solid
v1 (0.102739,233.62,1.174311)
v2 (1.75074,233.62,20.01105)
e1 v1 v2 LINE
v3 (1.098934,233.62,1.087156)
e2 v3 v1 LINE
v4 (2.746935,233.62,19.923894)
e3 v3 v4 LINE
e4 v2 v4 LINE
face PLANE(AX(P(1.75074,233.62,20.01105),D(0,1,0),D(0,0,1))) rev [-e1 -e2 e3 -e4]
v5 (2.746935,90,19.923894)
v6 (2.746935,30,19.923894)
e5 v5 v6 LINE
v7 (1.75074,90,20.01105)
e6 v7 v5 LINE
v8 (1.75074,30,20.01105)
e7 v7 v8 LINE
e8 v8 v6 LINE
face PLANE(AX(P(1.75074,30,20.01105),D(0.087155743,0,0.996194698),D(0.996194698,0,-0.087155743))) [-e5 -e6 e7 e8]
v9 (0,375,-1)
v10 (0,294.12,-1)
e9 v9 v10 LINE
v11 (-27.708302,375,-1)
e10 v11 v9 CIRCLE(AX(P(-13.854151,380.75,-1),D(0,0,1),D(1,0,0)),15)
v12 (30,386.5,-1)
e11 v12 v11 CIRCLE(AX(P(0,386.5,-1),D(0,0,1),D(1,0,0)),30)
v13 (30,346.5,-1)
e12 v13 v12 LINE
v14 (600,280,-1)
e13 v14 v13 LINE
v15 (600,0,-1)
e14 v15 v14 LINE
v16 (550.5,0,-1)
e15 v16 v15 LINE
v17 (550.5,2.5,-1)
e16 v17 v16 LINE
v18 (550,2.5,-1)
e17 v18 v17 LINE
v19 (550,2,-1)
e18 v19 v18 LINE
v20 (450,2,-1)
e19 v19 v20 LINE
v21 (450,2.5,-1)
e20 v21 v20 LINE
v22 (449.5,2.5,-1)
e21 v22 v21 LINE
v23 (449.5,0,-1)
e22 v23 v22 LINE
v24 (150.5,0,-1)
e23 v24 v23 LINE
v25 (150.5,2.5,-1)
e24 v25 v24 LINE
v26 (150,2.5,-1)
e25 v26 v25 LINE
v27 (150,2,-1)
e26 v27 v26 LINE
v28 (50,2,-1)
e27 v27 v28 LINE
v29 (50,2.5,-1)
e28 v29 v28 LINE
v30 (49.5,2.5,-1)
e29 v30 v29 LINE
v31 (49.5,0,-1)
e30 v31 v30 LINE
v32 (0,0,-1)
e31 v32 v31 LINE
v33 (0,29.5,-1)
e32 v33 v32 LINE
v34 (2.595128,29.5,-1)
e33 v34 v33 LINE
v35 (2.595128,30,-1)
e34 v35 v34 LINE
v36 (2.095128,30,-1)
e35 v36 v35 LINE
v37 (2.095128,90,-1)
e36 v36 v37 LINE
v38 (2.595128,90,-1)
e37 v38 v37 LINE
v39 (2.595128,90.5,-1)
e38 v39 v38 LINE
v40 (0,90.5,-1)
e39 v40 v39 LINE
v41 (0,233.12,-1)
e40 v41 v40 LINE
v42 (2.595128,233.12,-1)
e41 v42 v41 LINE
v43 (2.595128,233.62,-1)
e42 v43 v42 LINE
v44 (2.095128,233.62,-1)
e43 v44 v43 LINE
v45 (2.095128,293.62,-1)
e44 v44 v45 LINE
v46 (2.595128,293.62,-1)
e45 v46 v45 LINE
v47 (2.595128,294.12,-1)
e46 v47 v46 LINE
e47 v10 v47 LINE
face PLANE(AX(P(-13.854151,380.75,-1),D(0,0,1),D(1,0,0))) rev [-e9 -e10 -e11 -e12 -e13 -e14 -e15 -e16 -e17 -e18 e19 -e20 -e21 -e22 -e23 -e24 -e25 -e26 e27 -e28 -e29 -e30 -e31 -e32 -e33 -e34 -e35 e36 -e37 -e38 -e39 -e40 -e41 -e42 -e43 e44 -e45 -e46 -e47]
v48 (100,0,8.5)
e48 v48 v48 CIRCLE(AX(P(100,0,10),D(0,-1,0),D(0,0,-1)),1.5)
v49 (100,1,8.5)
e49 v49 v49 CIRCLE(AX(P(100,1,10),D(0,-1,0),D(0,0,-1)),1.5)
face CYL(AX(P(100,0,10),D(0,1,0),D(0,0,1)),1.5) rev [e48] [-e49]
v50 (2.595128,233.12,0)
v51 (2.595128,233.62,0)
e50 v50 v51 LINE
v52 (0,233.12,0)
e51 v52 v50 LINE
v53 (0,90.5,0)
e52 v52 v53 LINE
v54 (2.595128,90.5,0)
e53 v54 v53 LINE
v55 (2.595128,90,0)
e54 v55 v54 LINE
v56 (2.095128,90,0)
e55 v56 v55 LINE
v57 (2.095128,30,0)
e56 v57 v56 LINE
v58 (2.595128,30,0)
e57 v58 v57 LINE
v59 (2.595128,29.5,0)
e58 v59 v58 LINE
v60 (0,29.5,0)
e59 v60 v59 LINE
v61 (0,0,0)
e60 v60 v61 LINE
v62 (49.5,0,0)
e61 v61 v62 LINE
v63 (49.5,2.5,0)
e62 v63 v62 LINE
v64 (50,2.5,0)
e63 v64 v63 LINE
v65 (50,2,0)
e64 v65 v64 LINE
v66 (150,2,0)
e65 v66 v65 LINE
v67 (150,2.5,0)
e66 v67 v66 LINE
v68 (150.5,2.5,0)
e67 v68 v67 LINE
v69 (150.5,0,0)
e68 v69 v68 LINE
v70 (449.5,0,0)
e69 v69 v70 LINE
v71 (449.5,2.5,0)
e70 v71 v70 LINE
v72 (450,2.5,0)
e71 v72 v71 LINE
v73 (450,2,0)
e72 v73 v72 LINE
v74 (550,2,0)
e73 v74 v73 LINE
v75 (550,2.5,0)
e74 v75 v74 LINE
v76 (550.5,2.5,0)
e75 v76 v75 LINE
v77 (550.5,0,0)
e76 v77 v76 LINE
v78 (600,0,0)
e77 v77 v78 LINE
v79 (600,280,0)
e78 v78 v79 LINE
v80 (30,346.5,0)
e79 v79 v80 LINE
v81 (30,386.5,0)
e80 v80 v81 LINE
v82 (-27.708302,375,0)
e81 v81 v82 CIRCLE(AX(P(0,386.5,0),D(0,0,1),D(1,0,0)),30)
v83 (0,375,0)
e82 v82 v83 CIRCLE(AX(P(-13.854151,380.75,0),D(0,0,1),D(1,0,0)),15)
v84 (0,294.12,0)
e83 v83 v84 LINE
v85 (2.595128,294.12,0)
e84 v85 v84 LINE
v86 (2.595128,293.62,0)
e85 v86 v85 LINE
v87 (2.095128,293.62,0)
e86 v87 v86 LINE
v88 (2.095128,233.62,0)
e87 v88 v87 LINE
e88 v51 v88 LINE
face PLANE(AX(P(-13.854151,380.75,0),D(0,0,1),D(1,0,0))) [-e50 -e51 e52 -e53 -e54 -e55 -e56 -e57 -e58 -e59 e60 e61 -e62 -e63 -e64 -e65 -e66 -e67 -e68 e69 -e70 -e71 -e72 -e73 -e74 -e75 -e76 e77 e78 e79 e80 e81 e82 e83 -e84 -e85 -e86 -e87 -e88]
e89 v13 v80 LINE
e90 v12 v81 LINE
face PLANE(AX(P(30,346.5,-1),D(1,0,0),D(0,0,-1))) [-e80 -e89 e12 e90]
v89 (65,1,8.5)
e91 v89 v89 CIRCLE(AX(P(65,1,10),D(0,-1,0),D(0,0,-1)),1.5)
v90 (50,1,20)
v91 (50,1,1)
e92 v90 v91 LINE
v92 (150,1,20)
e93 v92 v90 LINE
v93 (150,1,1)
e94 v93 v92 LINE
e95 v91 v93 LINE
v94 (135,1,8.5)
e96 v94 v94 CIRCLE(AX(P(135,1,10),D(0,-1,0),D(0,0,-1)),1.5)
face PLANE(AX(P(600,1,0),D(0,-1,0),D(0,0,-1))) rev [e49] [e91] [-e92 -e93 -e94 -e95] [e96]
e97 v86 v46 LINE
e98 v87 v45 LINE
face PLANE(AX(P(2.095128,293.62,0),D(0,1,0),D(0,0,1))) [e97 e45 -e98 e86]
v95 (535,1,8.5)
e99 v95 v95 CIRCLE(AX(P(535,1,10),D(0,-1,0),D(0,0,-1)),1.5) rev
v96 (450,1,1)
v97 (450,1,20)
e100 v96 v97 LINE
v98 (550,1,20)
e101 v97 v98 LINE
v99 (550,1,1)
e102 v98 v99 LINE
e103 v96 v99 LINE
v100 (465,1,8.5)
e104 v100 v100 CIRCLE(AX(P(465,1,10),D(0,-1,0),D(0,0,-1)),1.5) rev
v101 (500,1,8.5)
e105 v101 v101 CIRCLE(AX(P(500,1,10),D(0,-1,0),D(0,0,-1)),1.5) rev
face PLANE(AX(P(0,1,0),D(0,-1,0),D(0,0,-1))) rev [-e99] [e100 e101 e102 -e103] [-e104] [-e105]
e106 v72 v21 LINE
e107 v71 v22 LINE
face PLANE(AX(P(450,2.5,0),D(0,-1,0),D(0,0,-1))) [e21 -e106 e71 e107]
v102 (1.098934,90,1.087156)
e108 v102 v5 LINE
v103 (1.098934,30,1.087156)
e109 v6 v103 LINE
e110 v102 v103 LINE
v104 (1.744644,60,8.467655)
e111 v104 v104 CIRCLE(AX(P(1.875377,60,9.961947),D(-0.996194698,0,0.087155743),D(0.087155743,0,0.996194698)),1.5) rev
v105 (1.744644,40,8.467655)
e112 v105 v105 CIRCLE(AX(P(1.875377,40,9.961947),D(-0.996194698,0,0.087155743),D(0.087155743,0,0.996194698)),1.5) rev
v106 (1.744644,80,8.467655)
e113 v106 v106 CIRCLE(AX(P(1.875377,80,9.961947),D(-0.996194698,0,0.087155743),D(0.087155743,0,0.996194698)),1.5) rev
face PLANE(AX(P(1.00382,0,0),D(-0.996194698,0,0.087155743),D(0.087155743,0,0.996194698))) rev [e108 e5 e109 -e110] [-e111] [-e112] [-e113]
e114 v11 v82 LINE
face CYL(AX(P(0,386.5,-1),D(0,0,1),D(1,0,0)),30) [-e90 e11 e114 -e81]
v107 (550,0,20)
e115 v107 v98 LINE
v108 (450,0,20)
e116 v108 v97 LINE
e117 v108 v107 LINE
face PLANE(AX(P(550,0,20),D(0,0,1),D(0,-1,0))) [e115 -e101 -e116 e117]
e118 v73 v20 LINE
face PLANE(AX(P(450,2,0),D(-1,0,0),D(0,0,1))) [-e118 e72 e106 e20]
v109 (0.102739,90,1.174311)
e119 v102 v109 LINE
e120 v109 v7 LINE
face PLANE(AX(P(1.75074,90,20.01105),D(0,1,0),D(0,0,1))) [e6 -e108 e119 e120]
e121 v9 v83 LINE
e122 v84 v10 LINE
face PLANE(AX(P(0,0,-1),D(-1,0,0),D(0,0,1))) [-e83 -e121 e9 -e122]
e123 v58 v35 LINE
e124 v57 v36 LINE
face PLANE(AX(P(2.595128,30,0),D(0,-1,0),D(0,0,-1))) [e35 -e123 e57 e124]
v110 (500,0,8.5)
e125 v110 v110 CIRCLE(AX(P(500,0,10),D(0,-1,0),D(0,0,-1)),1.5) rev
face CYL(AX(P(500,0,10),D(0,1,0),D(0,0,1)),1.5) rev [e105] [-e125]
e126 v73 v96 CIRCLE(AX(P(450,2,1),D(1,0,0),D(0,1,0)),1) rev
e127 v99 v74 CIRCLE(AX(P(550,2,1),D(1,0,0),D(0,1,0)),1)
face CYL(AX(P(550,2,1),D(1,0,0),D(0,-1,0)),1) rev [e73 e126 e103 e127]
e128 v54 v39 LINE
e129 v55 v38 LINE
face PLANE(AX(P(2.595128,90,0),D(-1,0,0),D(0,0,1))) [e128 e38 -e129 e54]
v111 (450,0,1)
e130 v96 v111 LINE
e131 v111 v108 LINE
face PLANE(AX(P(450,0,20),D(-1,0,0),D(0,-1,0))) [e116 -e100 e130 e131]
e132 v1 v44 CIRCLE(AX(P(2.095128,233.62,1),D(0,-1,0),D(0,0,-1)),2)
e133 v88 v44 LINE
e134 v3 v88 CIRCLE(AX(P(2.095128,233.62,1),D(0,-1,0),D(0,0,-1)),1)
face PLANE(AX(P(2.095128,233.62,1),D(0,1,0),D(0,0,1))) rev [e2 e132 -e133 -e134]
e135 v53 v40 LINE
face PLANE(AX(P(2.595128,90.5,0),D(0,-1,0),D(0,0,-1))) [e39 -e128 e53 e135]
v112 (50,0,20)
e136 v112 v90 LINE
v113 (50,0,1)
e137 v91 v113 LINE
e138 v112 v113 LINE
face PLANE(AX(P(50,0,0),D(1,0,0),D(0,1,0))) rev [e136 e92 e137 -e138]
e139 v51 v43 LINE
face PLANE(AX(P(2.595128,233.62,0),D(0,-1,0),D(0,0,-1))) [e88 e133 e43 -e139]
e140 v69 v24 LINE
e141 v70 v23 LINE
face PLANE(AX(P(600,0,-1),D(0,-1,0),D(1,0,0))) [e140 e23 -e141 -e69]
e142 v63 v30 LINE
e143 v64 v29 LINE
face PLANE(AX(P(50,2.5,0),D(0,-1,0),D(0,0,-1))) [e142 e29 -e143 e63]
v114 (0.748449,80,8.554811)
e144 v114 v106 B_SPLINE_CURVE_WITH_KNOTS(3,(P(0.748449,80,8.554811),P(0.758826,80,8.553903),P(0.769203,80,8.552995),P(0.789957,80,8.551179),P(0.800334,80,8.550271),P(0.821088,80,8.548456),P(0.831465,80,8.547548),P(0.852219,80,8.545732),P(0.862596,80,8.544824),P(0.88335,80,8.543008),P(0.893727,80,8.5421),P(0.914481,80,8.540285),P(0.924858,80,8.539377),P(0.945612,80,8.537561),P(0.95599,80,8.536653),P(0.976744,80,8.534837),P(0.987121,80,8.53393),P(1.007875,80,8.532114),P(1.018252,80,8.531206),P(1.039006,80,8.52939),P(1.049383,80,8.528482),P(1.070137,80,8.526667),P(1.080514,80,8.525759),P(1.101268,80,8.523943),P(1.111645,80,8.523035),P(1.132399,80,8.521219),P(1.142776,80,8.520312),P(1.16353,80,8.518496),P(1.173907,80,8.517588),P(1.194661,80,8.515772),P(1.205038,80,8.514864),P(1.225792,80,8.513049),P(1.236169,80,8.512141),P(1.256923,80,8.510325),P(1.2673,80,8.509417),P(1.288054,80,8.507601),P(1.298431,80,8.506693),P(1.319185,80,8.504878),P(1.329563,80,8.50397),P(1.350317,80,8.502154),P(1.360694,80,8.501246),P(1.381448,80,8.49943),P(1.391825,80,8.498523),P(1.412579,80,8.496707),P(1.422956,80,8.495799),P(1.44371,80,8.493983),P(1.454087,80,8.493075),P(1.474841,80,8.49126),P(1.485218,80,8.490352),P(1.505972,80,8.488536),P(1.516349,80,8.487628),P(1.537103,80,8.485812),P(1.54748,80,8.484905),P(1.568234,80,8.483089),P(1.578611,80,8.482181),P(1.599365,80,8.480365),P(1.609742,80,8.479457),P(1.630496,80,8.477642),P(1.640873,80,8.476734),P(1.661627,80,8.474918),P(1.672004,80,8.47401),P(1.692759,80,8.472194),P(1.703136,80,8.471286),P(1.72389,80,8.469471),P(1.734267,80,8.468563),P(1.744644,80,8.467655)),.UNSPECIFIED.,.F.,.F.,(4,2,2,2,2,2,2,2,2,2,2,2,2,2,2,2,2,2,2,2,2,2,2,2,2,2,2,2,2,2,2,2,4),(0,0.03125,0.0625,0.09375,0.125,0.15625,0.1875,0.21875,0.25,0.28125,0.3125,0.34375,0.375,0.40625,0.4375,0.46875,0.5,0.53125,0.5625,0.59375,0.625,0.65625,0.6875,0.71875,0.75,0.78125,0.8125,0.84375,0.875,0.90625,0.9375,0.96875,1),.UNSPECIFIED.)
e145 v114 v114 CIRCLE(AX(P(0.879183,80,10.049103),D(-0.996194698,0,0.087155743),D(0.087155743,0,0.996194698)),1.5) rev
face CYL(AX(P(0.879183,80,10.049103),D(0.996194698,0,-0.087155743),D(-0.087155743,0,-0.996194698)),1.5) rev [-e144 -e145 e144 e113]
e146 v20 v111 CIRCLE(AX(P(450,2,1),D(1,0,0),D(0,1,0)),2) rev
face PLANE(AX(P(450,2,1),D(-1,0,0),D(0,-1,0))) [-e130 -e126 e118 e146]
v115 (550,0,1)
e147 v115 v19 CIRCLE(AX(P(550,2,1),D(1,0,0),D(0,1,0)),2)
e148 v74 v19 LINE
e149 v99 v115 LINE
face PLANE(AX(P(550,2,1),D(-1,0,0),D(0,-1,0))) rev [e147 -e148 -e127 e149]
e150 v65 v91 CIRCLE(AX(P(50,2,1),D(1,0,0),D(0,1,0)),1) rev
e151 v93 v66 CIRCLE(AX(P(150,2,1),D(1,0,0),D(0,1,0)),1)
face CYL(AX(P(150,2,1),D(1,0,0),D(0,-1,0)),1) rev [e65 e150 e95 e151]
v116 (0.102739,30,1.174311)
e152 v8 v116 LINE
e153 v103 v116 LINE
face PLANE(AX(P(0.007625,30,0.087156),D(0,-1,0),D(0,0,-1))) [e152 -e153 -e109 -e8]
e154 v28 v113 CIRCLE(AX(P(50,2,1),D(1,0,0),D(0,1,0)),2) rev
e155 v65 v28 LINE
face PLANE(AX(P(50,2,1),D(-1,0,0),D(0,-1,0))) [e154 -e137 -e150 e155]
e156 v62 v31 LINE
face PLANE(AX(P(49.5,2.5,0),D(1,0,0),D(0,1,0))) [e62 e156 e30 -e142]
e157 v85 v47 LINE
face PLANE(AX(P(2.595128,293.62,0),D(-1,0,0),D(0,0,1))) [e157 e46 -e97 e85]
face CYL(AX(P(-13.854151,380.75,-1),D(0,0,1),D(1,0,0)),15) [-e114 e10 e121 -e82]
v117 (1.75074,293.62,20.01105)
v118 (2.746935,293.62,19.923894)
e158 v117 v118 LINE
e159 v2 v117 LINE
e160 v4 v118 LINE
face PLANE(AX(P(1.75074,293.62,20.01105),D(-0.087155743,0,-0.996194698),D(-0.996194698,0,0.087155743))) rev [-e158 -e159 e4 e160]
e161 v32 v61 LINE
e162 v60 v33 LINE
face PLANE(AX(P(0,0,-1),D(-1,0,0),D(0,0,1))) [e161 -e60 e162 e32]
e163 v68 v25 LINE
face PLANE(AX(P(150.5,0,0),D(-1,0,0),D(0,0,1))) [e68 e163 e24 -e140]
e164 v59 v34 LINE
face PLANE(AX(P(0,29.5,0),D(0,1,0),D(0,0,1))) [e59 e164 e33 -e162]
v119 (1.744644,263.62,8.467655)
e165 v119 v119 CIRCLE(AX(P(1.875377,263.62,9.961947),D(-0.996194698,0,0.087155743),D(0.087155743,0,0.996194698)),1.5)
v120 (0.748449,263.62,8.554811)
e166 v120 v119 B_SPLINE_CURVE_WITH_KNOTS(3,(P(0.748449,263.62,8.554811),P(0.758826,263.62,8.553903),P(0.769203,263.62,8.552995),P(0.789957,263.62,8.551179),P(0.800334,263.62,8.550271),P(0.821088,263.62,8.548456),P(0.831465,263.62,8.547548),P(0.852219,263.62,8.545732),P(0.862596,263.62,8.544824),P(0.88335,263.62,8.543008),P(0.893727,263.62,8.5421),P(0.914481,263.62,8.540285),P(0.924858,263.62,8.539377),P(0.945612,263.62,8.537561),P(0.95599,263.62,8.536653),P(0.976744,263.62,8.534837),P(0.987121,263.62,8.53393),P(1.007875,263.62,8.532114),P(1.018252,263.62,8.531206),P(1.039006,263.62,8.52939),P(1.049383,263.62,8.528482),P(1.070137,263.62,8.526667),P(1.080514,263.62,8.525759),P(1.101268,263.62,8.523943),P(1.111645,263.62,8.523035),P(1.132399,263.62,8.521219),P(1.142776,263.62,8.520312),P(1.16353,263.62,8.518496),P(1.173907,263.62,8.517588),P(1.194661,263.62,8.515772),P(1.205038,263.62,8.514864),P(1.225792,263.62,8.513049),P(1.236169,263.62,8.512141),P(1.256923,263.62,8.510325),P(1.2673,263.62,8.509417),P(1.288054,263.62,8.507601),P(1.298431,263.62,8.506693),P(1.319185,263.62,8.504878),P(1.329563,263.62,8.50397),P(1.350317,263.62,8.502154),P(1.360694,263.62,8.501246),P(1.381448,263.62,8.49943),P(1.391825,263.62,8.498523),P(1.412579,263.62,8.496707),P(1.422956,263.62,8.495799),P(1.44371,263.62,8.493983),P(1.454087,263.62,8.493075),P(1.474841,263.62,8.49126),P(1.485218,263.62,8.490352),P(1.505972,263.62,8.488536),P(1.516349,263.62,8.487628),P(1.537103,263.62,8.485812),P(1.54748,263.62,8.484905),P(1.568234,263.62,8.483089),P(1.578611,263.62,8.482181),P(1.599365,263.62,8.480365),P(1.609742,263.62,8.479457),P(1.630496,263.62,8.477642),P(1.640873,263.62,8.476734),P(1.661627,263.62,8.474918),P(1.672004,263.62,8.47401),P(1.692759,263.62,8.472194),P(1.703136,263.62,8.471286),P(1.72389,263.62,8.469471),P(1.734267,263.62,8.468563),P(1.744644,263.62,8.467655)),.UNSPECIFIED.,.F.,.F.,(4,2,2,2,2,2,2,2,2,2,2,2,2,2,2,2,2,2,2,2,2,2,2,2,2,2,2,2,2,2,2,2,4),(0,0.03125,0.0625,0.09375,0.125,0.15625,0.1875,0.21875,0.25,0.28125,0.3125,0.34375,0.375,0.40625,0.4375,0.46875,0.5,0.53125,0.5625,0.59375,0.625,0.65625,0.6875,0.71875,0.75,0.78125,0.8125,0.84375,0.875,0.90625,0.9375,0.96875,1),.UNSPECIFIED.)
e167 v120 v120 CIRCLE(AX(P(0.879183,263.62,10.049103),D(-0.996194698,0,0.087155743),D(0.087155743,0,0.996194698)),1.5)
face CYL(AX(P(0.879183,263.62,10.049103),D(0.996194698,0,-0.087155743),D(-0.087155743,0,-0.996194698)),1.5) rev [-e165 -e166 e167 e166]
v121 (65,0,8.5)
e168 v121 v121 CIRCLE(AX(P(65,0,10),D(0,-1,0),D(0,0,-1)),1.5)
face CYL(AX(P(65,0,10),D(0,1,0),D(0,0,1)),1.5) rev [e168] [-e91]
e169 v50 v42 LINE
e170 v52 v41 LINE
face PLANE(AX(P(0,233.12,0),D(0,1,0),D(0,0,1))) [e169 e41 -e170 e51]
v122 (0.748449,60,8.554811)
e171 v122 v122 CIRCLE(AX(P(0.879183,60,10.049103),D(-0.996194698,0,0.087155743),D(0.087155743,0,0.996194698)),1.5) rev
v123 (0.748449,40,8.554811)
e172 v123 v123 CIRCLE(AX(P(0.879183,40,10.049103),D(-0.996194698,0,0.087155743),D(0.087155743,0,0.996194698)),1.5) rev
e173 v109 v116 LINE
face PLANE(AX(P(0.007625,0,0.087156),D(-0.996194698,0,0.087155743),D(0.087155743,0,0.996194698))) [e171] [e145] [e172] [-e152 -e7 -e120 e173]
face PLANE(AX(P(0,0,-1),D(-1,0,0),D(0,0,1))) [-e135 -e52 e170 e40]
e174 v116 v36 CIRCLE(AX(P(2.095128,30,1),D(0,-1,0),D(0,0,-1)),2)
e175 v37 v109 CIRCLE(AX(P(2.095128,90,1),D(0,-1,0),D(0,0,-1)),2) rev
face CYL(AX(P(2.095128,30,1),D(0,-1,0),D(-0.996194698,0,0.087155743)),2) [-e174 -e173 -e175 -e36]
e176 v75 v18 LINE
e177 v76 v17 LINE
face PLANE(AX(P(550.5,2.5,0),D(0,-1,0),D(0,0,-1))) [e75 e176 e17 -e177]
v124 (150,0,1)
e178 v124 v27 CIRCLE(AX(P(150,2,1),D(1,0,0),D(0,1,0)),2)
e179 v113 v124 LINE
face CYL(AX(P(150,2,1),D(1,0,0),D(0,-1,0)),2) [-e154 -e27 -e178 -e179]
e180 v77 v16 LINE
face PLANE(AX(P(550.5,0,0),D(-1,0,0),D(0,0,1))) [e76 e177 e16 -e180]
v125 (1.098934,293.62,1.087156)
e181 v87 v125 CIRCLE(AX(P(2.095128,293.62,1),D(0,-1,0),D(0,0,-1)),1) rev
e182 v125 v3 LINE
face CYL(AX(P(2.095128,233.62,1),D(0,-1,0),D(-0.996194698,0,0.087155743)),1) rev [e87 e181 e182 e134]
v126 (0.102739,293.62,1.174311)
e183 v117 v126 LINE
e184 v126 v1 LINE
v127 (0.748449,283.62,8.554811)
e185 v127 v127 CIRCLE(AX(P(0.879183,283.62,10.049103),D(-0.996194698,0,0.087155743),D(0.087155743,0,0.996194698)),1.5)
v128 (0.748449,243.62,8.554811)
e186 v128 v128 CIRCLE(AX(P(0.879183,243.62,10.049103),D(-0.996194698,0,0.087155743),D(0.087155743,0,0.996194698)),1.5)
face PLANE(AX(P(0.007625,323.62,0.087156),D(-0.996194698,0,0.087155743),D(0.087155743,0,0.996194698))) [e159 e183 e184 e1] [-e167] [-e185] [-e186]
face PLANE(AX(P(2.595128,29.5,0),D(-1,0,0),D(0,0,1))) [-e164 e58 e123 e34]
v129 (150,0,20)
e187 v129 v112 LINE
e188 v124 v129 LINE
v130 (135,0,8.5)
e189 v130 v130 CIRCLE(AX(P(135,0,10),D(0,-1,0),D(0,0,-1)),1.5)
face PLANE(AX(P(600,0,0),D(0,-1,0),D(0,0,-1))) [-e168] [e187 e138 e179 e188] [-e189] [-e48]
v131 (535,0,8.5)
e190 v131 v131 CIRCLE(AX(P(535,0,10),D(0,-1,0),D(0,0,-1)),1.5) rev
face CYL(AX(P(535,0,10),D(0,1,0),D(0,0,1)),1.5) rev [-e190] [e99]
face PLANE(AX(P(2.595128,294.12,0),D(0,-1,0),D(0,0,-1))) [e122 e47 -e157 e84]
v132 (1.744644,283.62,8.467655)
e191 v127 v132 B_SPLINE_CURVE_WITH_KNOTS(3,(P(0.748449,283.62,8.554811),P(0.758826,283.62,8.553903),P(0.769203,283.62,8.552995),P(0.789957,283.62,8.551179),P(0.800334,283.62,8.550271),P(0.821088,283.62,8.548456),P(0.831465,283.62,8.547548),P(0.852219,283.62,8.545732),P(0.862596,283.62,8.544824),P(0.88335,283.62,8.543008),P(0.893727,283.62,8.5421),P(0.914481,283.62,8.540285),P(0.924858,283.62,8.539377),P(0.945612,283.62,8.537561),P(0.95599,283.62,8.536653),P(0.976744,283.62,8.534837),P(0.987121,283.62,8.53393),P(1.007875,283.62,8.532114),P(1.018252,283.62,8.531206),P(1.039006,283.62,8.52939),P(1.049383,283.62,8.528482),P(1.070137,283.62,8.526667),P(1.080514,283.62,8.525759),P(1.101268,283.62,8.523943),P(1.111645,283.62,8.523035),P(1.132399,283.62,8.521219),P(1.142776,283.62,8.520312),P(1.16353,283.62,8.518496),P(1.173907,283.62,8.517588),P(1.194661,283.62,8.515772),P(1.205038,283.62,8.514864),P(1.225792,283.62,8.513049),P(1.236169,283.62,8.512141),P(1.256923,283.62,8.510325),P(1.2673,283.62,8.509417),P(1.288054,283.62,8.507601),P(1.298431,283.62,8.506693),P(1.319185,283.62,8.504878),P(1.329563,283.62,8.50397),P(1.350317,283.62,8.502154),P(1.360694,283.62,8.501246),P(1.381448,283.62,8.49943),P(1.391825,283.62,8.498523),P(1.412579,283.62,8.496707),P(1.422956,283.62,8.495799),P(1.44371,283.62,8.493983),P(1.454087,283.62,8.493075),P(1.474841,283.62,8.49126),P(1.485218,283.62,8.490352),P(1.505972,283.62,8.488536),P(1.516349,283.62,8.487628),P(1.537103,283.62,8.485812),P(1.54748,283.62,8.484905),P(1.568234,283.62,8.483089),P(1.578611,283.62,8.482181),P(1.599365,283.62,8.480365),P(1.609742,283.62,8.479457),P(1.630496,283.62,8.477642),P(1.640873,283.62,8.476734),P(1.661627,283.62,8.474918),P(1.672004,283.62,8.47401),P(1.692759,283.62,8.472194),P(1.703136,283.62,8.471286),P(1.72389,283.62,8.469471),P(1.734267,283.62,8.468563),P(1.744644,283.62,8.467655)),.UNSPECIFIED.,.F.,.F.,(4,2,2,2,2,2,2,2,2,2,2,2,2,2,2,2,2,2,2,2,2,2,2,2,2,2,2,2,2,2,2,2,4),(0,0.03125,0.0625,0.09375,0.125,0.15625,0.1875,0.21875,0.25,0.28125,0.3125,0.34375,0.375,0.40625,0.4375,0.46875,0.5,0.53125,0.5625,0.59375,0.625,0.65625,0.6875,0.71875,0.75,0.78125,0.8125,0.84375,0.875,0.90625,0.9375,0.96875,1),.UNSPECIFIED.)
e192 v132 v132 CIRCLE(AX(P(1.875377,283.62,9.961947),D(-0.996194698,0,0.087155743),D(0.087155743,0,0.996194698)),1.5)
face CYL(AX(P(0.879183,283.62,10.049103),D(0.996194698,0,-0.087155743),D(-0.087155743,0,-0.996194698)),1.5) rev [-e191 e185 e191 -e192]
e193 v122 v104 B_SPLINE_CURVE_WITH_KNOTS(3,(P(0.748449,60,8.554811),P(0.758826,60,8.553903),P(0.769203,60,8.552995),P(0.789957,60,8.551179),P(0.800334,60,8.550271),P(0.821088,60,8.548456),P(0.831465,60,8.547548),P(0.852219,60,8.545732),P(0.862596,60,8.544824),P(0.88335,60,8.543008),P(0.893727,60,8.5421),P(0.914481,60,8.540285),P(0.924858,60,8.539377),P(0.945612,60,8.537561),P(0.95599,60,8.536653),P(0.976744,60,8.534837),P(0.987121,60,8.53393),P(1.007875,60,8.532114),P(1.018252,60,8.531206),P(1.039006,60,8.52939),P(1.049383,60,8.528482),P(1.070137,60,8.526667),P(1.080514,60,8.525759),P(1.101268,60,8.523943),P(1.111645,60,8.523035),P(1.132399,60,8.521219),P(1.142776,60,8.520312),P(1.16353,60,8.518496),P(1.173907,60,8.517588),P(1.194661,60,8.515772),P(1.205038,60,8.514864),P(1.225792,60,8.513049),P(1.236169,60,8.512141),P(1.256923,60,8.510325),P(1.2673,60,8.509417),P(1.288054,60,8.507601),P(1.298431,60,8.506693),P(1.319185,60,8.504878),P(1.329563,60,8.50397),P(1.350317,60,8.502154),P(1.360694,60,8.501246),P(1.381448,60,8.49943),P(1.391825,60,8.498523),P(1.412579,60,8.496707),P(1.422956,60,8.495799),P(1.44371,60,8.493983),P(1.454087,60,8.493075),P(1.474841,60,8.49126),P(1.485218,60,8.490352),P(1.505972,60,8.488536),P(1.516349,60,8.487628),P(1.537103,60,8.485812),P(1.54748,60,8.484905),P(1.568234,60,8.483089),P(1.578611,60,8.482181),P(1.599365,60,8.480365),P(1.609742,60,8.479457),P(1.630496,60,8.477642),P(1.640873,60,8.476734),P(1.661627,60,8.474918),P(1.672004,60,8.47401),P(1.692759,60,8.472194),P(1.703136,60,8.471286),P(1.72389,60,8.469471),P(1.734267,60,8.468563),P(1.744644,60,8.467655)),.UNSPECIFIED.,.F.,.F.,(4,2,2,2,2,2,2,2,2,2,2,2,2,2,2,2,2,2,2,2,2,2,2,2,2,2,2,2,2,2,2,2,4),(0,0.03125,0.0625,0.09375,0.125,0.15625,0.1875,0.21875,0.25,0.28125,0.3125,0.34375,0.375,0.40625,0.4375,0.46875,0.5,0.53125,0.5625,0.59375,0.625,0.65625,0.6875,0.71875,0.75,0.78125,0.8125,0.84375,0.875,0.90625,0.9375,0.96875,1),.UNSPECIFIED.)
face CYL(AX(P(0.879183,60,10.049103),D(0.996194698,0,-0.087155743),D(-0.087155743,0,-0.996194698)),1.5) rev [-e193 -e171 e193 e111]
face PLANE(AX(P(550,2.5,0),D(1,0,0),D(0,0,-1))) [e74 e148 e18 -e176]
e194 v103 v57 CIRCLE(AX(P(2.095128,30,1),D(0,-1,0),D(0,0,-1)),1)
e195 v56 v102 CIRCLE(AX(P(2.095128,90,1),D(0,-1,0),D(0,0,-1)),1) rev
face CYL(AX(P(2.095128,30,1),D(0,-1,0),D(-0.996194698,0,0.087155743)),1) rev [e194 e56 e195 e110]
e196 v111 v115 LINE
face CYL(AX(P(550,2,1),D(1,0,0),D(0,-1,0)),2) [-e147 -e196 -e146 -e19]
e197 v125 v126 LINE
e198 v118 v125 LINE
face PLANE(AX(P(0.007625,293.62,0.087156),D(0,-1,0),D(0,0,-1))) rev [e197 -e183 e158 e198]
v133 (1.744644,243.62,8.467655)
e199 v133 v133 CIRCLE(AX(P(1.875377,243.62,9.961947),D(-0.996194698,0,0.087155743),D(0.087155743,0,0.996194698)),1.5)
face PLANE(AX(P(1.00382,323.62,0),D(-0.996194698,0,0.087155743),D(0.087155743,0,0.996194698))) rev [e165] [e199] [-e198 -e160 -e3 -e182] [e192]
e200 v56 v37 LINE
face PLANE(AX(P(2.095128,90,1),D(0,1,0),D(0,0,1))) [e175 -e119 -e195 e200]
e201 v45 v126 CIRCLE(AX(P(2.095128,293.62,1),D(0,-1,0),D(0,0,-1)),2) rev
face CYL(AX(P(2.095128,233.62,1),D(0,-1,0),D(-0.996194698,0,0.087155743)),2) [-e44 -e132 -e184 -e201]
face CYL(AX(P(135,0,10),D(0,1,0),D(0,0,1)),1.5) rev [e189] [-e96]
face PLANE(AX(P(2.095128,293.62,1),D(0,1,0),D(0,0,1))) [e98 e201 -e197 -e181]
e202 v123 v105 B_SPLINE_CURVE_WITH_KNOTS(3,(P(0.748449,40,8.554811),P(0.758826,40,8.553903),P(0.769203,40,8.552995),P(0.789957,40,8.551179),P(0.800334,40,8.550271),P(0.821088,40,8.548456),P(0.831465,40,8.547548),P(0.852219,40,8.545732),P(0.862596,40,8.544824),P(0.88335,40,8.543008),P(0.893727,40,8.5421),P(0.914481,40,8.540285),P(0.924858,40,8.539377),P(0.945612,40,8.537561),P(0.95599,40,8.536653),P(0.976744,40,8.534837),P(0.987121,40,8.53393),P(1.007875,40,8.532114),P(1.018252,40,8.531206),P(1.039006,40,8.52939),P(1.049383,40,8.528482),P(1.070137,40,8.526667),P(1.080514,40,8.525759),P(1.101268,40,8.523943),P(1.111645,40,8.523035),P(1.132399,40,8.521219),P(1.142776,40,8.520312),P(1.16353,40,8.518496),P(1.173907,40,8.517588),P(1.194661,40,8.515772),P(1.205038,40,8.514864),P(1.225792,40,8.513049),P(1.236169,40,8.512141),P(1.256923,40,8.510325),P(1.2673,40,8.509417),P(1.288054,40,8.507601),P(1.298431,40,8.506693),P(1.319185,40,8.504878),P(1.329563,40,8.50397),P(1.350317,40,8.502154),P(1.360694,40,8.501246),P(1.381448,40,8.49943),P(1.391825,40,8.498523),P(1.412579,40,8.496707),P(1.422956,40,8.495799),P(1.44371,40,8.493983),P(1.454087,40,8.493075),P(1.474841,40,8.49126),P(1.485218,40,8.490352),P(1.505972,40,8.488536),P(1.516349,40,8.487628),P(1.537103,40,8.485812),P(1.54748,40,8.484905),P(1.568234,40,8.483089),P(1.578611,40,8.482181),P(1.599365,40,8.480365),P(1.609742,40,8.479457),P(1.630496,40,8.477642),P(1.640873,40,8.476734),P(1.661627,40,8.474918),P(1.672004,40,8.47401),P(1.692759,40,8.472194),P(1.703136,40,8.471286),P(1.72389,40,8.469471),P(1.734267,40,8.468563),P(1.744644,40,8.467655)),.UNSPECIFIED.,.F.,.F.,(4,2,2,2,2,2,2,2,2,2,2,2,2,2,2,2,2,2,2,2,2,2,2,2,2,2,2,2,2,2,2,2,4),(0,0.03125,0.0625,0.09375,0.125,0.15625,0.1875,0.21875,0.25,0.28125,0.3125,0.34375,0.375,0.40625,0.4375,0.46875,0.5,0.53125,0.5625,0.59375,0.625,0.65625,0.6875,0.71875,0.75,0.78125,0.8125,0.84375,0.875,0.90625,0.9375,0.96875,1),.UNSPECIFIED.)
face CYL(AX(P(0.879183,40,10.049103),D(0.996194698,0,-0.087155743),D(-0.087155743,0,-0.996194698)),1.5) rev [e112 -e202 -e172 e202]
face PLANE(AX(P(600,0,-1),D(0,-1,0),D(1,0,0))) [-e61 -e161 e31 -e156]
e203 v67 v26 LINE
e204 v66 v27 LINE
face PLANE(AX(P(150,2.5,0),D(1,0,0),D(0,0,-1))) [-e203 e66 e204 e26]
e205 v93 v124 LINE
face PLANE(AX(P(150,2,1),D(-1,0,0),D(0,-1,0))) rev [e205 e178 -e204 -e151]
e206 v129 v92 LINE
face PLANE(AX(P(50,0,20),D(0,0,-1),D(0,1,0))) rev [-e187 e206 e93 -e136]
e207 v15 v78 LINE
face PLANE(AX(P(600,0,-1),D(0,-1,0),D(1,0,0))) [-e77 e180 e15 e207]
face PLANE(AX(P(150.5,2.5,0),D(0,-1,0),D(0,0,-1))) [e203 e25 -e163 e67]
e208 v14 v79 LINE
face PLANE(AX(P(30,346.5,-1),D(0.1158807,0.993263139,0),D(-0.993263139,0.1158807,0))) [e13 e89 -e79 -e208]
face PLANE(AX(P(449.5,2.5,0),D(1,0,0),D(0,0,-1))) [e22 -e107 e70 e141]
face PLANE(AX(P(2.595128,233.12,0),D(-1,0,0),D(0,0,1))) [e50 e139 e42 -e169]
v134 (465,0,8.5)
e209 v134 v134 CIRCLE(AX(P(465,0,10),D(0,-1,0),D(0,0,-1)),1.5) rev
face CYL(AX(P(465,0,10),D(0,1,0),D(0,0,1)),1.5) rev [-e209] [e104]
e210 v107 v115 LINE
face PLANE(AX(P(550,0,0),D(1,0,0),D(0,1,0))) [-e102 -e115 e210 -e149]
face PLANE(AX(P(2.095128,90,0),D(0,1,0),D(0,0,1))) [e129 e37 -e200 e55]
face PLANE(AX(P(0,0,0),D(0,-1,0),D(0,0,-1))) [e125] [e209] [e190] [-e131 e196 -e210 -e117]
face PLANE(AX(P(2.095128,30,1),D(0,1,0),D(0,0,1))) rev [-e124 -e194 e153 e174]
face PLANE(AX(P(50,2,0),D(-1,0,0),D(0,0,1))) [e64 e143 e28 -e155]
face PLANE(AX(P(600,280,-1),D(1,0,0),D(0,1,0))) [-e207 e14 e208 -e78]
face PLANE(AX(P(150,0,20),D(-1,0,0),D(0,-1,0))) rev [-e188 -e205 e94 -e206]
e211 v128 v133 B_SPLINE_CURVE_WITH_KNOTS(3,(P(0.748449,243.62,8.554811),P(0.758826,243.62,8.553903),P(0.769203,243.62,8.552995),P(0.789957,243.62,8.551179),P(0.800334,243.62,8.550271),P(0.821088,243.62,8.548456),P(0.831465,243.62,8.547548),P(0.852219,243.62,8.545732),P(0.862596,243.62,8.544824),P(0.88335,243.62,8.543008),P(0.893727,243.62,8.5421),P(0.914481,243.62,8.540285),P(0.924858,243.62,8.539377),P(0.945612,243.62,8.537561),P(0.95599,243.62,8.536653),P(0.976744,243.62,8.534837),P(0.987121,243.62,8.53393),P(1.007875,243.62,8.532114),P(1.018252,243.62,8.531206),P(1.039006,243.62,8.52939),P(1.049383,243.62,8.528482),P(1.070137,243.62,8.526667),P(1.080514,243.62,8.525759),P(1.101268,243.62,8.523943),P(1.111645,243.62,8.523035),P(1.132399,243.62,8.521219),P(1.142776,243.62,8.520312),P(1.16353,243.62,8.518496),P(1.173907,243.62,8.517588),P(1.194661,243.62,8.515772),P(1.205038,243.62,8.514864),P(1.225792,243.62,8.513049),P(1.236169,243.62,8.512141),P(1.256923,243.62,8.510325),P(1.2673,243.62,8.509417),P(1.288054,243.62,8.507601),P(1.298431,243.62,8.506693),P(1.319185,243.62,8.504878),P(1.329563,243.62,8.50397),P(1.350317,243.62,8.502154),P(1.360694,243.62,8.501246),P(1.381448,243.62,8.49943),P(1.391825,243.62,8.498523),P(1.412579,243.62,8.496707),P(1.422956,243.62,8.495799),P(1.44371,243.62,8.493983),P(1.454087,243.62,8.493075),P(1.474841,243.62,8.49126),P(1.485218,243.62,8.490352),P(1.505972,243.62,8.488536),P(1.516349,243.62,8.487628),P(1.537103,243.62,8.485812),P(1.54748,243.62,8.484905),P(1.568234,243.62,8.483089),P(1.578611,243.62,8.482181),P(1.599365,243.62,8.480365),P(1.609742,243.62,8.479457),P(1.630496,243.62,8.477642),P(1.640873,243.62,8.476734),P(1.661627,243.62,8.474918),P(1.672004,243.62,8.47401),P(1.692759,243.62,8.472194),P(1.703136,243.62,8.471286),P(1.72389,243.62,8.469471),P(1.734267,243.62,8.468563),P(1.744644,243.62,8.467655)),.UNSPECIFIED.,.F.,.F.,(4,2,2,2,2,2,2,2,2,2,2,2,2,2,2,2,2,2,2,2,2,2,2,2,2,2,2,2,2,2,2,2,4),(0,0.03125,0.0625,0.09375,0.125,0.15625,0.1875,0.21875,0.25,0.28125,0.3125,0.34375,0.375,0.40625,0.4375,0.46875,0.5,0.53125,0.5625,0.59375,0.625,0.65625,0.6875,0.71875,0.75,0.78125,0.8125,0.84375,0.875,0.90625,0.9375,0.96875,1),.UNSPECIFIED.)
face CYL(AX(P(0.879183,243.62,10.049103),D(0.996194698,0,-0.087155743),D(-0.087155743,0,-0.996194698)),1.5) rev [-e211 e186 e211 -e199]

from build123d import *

# Parameters (mm, degrees)
BASE_FLANGE1_DEPTH            = 1
EDGE_FLANGE1_STRIP_W          = 6
EDGE_FLANGE1_STRIP_H          = 1
EDGE_FLANGE1_STRIP_CUT_DEPTH  = 100
EDGE_FLANGE1_RELIEF_W         = 6.5
EDGE_FLANGE1_RELIEF_H         = 0.5
EDGE_FLANGE1_RELIEF_CUT_DEPTH = 1
EDGE_FLANGE1_DEPTH            = 100
EDGE_FLANGE1_PROFILE_W        = 100
EDGE_FLANGE1_PROFILE_H        = 19
EDGE_FLANGE1_PROFILE_R        = 1.5
EDGE_FLANGE1_FLAT_DEPTH       = 1
EDGE_FLANGE2_START            = 29.5
EDGE_FLANGE2_DEPTH            = 61
EDGE_FLANGE2_2_DEPTH          = 0.5
EDGE_FLANGE2_START_2          = 90
EDGE_FLANGE2_3_DEPTH          = 0.5
EDGE_FLANGE2_START_3          = 30
EDGE_FLANGE2_4_DEPTH          = 60
EDGE_FLANGE2_5_OUTLINE_R      = 1.5
EDGE_FLANGE2_5_DEPTH          = 1


with BuildPart() as part:
    # Base-Flange1: sheet metal written as solids
    # Sketch1 → Base-Flange1 (new body)
    with BuildSketch(Plane.XY):
        with BuildLine():
            Line((0, 0), (0, 350))
            Line((0, 350), (0, 375))
            ThreePointArc((0, 375), (-13.854151002, 365.75), (-27.708302005, 375))
            ThreePointArc((-27.708302005, 375), (-5.863059775, 415.921497754), (30, 386.5))
            Line((30, 386.5), (30, 346.5))
            Line((30, 346.5), (600, 280))
            Line((600, 280), (600, 0))
            Line((600, 0), (0, 0))
        make_face()
    extrude(amount=-BASE_FLANGE1_DEPTH)

    # Edge-Flange1: sheet metal written as solids
    # Edge-Flange1 strip (on a plane across the edge) → Edge-Flange1 strip cut (cut)
    with BuildSketch(Plane.YZ.offset(450)):
        with Locations((-1, -0.5)):
            Rectangle(EDGE_FLANGE1_STRIP_W, EDGE_FLANGE1_STRIP_H)
    edge_flange1_strip_cut = extrude(amount=EDGE_FLANGE1_STRIP_CUT_DEPTH, mode=Mode.SUBTRACT)

    # Edge-Flange1 relief (on the sheet) → Edge-Flange1 relief cut (cut)
    with BuildSketch(Plane(origin=(450, 2, 0), x_dir=(0, 1, 0), z_dir=(0, 0, 1))):
        with Locations((-2.75, 0.25)):
            Rectangle(EDGE_FLANGE1_RELIEF_W, EDGE_FLANGE1_RELIEF_H)
        with Locations((-2.75, -100.25)):
            Rectangle(EDGE_FLANGE1_RELIEF_W, EDGE_FLANGE1_RELIEF_H)
    edge_flange1_relief_cut = extrude(amount=-EDGE_FLANGE1_RELIEF_CUT_DEPTH, mode=Mode.SUBTRACT)

    # Edge-Flange1 bend section (on a plane across the edge) → Edge-Flange1 (add)
    with BuildSketch(Plane.YZ.offset(450)):
        with BuildLine():
            Line((0, 1), (1, 1))
            ThreePointArc((1, 1), (1.292893219, 0.292893219), (2, 0))
            Line((2, 0), (2, -1))
            ThreePointArc((2, -1), (0.585786438, -0.414213562), (0, 1))
        make_face()
    edge_flange1 = extrude(amount=EDGE_FLANGE1_DEPTH)

    # Edge-Flange1 profile (on flange) → Edge-Flange1 flat (add)
    with BuildSketch(Plane(origin=(0, 0, 0), x_dir=(-1, 0, 0), z_dir=(0, 1, 0))):
        with Locations((-500, 10.5)):
            Rectangle(EDGE_FLANGE1_PROFILE_W, EDGE_FLANGE1_PROFILE_H)
        with Locations((-535, 10)):
            Circle(EDGE_FLANGE1_PROFILE_R, mode=Mode.SUBTRACT)
        with Locations((-465, 10)):
            Circle(EDGE_FLANGE1_PROFILE_R, mode=Mode.SUBTRACT)
        with Locations((-500, 10)):
            Circle(EDGE_FLANGE1_PROFILE_R, mode=Mode.SUBTRACT)
    edge_flange1_flat = extrude(amount=EDGE_FLANGE1_FLAT_DEPTH)

    # Mirror1: Edge-Flange1 strip cut, Edge-Flange1 relief cut, Edge-Flange1, Edge-Flange1 flat across plane
    add(edge_flange1_strip_cut.mirror(Plane(origin=(300, 0, 0), x_dir=(0, 0, 1), z_dir=(1, 0, 0))), mode=Mode.SUBTRACT)
    add(edge_flange1_relief_cut.mirror(Plane(origin=(300, 0, 0), x_dir=(0, 0, 1), z_dir=(1, 0, 0))), mode=Mode.SUBTRACT)
    add(edge_flange1.mirror(Plane(origin=(300, 0, 0), x_dir=(0, 0, 1), z_dir=(1, 0, 0))))
    add(edge_flange1_flat.mirror(Plane(origin=(300, 0, 0), x_dir=(0, 0, 1), z_dir=(1, 0, 0))))

    # Edge-Flange2: read off the stored shape, not the designer's step
    # Edge-Flange2 outline → Edge-Flange2 (cut)
    with BuildSketch(Plane(origin=(0, 0, 0), x_dir=(1, 0, 0), z_dir=(0, 1, 0)).offset(EDGE_FLANGE2_START)):
        with BuildLine():
            ThreePointArc((0.363077531, 0), (1.095128339, 0.732050808), (2.095128339, 1))
            Line((2.095128339, 1), (0, 1))
            Line((0, 1), (0, 0))
            Line((0, 0), (0.363077531, 0))
        make_face()
    edge_flange2 = extrude(amount=EDGE_FLANGE2_DEPTH, mode=Mode.SUBTRACT)

    # Edge-Flange2 2 outline → Edge-Flange2 2 (cut)
    with BuildSketch(Plane(origin=(0, 0, 0), x_dir=(1, 0, 0), z_dir=(0, 1, 0)).offset(EDGE_FLANGE2_START)):
        with BuildLine():
            Line((2.595128339, 0), (2.595128339, 1))
            Line((2.595128339, 1), (2.095128339, 1))
            ThreePointArc((2.095128339, 1), (1.095128339, 0.732050808), (0.363077531, 0))
            Line((0.363077531, 0), (2.595128339, 0))
        make_face()
    edge_flange2_2 = extrude(amount=EDGE_FLANGE2_2_DEPTH, mode=Mode.SUBTRACT)

    # Edge-Flange2 3 outline → Edge-Flange2 3 (cut)
    with BuildSketch(Plane(origin=(0, 0, 0), x_dir=(1, 0, 0), z_dir=(0, 1, 0)).offset(EDGE_FLANGE2_START_2)):
        with BuildLine():
            Line((2.595128339, 0), (2.595128339, 1))
            Line((2.595128339, 1), (2.095128339, 1))
            ThreePointArc((2.095128339, 1), (1.095128339, 0.732050808), (0.363077531, 0))
            Line((0.363077531, 0), (2.595128339, 0))
        make_face()
    edge_flange2_3 = extrude(amount=EDGE_FLANGE2_3_DEPTH, mode=Mode.SUBTRACT)

    # Edge-Flange2 4 outline → Edge-Flange2 4 (add)
    with BuildSketch(Plane(origin=(0, 0, 0), x_dir=(1, 0, 0), z_dir=(0, 1, 0)).offset(EDGE_FLANGE2_START_3)):
        with BuildLine():
            ThreePointArc((1.098933641, -1.087155743), (1.357851002, -0.324409792), (2.095128339, 0))
            Line((2.095128339, 0), (0.363077531, 0))
            ThreePointArc((0.363077531, 0), (0.142536324, -0.567120772), (0.102738942, -1.174311485))
            Line((0.102738942, -1.174311485), (1.750739994, -20.011049705))
            Line((1.750739994, -20.011049705), (2.746934692, -19.923893962))
            Line((2.746934692, -19.923893962), (1.098933641, -1.087155743))
        make_face()
    edge_flange2_4 = extrude(amount=EDGE_FLANGE2_4_DEPTH)

    # Edge-Flange2 5 outline → Edge-Flange2 5 (cut)
    with BuildSketch(Plane(origin=(0, 0, 0), x_dir=(0, 1, 0), z_dir=(0.9961946980917459, 0, -0.0871557427476548))):
        with Locations((80, 10.087488664)):
            Circle(EDGE_FLANGE2_5_OUTLINE_R)
        with Locations((60, 10.087488664)):
            Circle(EDGE_FLANGE2_5_OUTLINE_R)
        with Locations((40, 10.087488664)):
            Circle(EDGE_FLANGE2_5_OUTLINE_R)
    edge_flange2_5 = extrude(amount=EDGE_FLANGE2_5_DEPTH, mode=Mode.SUBTRACT)

    # Mirror2: Edge-Flange2, Edge-Flange2 2, Edge-Flange2 3, Edge-Flange2 4, Edge-Flange2 5 across plane
    add(edge_flange2.mirror(Plane.ZX.offset(161.81)), mode=Mode.SUBTRACT)
    add(edge_flange2_2.mirror(Plane.ZX.offset(161.81)), mode=Mode.SUBTRACT)
    add(edge_flange2_3.mirror(Plane.ZX.offset(161.81)), mode=Mode.SUBTRACT)
    add(edge_flange2_4.mirror(Plane.ZX.offset(161.81)))
    add(edge_flange2_5.mirror(Plane.ZX.offset(161.81)), mode=Mode.SUBTRACT)


solid = part.part
